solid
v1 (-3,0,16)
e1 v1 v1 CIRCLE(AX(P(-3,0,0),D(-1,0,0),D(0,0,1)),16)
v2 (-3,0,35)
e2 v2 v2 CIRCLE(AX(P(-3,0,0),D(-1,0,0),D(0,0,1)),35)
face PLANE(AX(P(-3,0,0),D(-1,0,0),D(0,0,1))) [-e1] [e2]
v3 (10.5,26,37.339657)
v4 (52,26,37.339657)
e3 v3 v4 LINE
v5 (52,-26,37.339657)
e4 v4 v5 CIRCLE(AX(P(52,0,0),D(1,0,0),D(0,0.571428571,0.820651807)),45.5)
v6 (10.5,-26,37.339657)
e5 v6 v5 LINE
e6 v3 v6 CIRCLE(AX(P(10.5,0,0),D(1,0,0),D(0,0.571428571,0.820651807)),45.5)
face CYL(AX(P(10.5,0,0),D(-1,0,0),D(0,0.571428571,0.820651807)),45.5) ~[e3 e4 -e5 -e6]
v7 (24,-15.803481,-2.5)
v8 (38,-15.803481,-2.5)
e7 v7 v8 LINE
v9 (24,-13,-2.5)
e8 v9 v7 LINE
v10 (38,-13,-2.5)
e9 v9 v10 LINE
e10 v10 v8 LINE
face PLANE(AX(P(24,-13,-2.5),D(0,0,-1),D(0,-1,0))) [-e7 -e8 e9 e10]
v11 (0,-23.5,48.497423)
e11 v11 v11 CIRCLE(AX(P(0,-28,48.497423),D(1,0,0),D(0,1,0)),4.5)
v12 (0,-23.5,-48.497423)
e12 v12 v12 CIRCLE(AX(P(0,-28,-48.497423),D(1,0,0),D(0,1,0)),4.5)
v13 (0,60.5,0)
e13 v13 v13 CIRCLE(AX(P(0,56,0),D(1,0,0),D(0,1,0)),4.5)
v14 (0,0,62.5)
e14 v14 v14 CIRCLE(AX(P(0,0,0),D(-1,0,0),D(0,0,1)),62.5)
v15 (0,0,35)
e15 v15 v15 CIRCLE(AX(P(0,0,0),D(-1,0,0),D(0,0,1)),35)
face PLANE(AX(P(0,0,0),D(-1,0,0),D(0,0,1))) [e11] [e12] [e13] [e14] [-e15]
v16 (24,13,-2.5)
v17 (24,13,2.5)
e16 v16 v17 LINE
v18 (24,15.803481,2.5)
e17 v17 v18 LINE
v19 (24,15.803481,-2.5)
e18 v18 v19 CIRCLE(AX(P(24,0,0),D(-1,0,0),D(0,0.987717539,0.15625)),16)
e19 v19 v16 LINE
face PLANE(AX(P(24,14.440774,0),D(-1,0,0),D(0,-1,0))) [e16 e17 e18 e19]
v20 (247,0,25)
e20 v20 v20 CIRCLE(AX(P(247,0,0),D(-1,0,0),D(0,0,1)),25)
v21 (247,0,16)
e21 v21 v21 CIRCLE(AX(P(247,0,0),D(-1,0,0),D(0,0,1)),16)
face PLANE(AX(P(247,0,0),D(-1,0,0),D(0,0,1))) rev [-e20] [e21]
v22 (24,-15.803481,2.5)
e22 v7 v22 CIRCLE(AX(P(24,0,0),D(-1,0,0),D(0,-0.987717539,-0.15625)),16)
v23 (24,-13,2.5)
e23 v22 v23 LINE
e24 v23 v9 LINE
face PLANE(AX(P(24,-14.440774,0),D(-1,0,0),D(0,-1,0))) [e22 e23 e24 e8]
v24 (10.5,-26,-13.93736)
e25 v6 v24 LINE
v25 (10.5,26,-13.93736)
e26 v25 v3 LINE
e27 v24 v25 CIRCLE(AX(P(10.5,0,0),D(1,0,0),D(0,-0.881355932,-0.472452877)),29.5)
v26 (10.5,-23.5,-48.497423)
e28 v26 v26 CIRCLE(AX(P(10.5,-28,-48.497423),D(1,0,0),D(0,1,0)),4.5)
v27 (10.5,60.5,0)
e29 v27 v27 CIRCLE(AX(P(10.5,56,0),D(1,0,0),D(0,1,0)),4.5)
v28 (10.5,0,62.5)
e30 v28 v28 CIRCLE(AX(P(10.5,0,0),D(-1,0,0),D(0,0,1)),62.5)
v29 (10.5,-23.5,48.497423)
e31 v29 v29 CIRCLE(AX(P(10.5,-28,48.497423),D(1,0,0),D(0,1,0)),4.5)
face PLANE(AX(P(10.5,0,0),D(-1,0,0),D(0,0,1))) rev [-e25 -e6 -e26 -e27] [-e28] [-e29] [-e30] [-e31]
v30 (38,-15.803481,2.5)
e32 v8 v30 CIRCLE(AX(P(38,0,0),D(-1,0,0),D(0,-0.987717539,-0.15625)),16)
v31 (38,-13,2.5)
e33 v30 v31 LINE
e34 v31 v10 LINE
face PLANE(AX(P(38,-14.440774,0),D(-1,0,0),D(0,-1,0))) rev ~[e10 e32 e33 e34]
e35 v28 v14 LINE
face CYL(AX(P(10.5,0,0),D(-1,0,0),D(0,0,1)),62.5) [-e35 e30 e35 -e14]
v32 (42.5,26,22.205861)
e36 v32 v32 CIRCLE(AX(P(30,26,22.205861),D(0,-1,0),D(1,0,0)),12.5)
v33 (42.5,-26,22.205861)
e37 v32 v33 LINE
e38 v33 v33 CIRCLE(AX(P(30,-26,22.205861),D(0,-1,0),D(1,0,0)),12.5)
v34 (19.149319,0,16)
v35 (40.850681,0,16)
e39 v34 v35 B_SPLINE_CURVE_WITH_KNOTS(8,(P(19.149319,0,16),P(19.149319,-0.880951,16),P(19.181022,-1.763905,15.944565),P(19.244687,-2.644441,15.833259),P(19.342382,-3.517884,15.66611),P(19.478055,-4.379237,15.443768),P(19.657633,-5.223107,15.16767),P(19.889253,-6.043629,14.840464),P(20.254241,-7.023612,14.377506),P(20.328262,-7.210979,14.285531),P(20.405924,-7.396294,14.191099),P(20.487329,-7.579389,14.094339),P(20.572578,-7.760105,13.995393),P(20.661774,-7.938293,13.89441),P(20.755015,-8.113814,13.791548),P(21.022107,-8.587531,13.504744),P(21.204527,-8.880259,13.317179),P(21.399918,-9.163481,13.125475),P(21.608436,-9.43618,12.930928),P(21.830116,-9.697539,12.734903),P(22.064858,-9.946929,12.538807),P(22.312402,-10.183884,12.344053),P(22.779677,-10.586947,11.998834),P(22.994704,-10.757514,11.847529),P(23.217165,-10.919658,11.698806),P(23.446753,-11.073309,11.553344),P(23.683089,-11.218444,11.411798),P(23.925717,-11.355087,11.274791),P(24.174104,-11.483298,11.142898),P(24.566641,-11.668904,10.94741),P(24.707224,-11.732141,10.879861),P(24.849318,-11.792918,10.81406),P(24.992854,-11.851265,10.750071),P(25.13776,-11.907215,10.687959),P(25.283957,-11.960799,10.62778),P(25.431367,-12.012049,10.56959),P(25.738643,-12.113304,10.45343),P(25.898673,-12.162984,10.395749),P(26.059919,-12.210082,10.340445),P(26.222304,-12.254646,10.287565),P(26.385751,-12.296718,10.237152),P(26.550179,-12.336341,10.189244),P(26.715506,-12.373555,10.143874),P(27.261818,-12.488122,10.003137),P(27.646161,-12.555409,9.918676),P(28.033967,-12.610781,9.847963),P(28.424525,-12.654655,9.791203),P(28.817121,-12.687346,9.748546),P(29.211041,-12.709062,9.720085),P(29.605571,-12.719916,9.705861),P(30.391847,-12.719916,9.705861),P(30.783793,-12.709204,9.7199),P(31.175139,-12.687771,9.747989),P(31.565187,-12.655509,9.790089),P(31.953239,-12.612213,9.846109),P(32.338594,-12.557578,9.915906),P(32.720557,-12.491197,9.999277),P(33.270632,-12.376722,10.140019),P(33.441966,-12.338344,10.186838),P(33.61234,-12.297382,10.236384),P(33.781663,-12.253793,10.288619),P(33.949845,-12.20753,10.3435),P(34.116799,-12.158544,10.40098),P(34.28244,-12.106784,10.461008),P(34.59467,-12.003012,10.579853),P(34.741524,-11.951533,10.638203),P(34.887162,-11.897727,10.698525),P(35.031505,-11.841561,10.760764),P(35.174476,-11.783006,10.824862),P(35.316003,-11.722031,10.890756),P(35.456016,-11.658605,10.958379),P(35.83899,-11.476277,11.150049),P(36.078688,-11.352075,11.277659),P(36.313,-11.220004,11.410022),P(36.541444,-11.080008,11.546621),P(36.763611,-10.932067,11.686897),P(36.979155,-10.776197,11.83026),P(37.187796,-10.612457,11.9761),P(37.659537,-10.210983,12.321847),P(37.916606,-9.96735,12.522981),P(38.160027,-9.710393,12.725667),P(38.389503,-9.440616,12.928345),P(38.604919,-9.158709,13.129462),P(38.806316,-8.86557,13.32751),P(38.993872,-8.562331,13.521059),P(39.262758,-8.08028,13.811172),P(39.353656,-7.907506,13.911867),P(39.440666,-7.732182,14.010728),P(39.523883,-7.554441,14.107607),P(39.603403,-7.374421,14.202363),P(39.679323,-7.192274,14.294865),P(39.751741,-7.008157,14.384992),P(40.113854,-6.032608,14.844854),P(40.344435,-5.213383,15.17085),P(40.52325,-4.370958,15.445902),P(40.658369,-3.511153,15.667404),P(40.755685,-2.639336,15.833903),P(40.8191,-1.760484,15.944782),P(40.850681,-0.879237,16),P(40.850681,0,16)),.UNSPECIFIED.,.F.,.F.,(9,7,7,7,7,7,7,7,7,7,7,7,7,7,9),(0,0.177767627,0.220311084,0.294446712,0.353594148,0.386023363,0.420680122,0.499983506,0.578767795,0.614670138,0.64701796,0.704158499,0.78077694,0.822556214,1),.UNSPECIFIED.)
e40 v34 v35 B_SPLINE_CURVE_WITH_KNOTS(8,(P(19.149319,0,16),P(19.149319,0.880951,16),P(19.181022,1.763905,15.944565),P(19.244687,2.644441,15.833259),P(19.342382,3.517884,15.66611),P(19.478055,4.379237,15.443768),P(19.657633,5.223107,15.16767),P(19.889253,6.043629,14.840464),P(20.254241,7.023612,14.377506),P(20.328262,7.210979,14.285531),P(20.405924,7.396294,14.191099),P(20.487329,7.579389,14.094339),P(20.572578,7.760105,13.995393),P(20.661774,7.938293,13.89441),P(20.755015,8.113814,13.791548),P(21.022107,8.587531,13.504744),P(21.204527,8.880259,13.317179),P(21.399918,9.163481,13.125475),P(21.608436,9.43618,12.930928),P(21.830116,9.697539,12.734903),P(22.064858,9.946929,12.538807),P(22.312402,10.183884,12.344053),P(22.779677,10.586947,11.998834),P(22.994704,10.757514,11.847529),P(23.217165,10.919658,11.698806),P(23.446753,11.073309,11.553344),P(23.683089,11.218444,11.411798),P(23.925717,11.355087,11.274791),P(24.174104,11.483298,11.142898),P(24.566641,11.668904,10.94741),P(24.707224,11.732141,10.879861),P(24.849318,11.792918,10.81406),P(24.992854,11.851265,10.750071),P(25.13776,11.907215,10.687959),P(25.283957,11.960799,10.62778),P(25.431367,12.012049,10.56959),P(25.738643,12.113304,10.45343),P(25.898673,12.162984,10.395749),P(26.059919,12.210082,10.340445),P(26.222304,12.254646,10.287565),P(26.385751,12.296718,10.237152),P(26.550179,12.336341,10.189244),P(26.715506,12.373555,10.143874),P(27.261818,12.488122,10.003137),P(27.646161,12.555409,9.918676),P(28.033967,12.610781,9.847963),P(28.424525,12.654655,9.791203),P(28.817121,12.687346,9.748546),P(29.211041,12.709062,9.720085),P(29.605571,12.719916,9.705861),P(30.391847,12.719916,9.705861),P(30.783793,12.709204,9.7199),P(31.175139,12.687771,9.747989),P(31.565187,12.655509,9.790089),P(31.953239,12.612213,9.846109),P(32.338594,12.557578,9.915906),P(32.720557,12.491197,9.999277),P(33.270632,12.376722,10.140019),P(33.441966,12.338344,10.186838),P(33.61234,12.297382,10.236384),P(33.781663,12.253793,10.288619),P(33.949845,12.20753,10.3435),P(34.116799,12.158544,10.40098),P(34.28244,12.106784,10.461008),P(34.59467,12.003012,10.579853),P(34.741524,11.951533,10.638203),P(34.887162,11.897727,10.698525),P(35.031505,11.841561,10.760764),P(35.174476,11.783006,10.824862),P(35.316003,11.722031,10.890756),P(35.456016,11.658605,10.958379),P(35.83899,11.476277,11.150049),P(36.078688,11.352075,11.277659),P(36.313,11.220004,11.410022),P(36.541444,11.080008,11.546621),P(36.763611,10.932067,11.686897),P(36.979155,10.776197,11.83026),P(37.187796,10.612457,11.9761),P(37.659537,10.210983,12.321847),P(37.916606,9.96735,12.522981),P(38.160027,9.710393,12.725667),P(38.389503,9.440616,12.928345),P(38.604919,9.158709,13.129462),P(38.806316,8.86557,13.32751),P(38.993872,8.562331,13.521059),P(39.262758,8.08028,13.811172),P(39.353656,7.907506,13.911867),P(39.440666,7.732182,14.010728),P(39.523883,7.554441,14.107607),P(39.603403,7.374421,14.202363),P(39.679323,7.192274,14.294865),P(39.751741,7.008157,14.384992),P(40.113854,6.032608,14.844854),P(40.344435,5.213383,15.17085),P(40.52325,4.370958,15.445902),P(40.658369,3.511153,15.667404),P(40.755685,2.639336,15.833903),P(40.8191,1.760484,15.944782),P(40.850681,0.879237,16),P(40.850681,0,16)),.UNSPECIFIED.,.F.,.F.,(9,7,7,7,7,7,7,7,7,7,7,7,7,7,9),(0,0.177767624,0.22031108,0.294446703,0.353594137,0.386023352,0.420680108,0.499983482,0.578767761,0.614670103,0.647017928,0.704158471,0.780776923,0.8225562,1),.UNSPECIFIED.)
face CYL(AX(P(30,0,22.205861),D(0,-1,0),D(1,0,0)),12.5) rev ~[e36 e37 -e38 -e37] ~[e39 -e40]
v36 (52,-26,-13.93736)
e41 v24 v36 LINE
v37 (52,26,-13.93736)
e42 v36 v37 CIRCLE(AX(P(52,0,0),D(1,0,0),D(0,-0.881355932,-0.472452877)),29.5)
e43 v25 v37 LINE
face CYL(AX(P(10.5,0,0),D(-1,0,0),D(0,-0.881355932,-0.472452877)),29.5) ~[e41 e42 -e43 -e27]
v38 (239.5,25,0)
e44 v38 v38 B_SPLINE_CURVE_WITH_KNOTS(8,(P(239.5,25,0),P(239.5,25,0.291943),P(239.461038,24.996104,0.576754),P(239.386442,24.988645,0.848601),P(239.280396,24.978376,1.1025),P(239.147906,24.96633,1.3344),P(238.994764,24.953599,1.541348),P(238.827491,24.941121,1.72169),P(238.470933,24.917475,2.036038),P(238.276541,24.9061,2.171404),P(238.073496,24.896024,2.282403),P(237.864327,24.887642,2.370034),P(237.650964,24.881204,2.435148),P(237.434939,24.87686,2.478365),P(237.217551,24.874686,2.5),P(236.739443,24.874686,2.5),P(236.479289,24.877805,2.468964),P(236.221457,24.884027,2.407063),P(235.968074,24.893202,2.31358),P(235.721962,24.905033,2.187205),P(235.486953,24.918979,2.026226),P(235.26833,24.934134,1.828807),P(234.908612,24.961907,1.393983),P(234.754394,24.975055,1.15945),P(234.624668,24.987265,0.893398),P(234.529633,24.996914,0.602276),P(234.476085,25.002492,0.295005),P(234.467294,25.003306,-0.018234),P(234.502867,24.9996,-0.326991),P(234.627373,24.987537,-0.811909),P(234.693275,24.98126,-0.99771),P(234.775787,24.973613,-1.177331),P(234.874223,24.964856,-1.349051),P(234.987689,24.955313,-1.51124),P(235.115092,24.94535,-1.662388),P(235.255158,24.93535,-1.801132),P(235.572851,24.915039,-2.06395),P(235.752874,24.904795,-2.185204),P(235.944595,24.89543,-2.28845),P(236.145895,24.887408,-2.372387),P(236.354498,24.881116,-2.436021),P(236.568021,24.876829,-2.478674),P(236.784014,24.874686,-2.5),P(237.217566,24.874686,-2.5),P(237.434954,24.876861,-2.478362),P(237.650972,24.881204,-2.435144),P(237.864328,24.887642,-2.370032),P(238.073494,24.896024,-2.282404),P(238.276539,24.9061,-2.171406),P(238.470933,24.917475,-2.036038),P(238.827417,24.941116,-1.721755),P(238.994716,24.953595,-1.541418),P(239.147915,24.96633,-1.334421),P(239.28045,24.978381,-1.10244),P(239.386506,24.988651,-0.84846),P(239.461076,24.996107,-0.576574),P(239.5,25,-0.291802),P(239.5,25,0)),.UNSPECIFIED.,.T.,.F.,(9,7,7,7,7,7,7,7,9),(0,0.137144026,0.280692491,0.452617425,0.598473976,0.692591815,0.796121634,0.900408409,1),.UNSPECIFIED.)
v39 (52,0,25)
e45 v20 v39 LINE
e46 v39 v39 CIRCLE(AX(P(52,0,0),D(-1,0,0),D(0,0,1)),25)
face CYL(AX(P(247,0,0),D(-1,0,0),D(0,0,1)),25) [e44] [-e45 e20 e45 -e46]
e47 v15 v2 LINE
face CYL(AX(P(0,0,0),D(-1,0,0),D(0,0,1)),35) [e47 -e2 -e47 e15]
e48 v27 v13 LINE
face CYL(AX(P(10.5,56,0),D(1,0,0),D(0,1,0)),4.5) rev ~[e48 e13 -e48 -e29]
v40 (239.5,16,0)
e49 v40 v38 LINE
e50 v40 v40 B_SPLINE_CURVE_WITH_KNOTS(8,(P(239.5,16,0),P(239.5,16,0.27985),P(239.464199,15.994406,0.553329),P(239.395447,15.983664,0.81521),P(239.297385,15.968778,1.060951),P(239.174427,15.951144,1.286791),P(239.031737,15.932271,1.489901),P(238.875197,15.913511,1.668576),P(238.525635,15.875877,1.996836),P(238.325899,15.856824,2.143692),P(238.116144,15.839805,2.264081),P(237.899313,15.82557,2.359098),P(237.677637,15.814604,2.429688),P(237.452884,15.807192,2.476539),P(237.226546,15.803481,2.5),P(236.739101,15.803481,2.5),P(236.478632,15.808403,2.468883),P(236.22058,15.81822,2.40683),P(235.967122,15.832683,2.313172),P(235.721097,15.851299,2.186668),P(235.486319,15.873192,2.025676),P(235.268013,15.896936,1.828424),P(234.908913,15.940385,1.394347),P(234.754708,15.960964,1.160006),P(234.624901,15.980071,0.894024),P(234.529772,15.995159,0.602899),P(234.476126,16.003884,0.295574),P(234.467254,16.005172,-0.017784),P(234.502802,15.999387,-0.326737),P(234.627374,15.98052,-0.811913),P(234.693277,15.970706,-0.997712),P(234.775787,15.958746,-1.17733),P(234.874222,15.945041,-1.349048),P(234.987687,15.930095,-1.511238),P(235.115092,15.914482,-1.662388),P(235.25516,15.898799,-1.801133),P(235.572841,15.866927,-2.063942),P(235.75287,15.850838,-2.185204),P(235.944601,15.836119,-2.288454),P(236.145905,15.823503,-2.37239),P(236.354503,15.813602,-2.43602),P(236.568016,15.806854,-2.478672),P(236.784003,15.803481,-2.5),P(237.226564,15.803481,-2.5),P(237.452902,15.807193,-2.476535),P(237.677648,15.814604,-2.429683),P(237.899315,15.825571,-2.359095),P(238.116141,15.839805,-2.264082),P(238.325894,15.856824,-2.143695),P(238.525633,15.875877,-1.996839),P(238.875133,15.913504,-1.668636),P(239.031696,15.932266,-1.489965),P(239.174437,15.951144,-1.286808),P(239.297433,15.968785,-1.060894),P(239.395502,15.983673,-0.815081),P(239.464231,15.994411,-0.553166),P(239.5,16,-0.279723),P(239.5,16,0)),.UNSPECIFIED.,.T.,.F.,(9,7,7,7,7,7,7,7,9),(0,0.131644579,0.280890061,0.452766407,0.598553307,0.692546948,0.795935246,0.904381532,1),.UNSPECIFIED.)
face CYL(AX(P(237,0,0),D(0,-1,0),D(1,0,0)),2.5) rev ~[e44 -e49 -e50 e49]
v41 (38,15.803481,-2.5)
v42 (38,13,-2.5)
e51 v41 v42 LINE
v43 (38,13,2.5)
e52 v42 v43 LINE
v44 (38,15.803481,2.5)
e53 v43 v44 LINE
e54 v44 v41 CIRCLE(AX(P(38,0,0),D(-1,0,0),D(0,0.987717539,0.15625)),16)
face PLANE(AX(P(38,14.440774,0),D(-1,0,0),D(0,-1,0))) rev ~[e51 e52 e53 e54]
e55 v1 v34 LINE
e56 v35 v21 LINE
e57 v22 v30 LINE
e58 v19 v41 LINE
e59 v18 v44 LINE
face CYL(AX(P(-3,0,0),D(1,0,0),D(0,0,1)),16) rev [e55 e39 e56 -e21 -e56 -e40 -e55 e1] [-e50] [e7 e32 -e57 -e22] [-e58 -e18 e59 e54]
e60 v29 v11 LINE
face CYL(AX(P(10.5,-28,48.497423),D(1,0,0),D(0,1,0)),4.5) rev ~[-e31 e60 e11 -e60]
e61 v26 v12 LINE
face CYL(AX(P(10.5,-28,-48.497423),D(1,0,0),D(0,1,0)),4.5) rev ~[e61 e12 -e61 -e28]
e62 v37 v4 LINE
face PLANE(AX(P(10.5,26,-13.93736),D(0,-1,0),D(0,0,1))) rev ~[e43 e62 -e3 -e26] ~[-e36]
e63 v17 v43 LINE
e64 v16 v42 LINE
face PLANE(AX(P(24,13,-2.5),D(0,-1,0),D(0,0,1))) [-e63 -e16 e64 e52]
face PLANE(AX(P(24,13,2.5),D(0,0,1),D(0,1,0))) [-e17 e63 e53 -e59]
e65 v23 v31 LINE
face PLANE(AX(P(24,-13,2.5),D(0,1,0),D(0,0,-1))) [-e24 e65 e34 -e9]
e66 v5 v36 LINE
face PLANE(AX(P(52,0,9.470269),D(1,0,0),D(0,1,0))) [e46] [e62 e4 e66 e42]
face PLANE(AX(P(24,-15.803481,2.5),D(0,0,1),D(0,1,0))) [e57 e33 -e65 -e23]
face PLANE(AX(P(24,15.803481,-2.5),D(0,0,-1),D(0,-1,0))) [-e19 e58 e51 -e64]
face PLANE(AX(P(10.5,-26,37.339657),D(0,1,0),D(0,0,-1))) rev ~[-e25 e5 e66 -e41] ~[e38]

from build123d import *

# Parameters (mm, degrees)
F2_R      = 25
F3_DEPTH  = 41.5
F4_R      = 12.5
F5_DEPTH  = 30
F6_R      = 2.5
F7_DEPTH  = 62.501
F8_R      = 4.5
F9_DEPTH  = 13.5010001
F12_DEPTH = 14


with BuildPart() as f1:
    # F0 (on Front) → F1 (revolve)
    with BuildSketch(Plane.XZ):
        Polygon((10.5, 62.5), (0, 62.5), (0, 35), (-3, 35), (-3, 16), (247, 16), (247, 25), (10.5, 25), align=None)
    revolve(axis=Axis((-11.2489545718, 0, 0), (-1, 0, 0)))

    # F2 (on face) → F3 (join)
    with BuildSketch(Plane.YZ.offset(10.5)):
        with BuildLine():
            Line((26, -13.9373598648), (26, 37.3396572025))
            ThreePointArc((26, 37.3396572025), (0, 45.5), (-26, 37.3396572025))
            Line((-26, 37.3396572025), (-26, -13.9373598648))
            ThreePointArc((-26, -13.9373598648), (0, -29.5), (26, -13.9373598648))
        make_face()
        Circle(F2_R, mode=Mode.SUBTRACT)
    extrude(amount=F3_DEPTH)

    # F4 (on Front) → F5 (cut, symmetric)
    with BuildSketch(Plane.XZ):
        with Locations((30, 22.2058613113)):
            Circle(F4_R)
    extrude(amount=F5_DEPTH, both=True, mode=Mode.SUBTRACT)

    # F6 (on Front) → F7 (cut, through all)
    with BuildSketch(Plane.XZ):
        with Locations((237, 0)):
            Circle(F6_R)
    extrude(amount=-F7_DEPTH, mode=Mode.SUBTRACT)

    # F8 (on face) → F9 (cut, through all)
    with BuildSketch(Plane.YZ.offset(10.5)):
        with Locations((-28, 48.4974226119)):
            Circle(F8_R)
        with Locations((56, 0)):
            Circle(F8_R)
        with Locations((-28, -48.4974226119)):
            Circle(F8_R)
    extrude(amount=-F9_DEPTH, mode=Mode.SUBTRACT)

    # F11 (on offset) → F12 (join)
    with BuildSketch(Plane(origin=(24, 0, 0), x_dir=(0, -1, 0), z_dir=(-1, 0, 0))):
        with BuildLine():
            Line((-13, 2.5), (-15.8034806293, 2.5))
            ThreePointArc((-15.8034806293, 2.5), (-16, 0), (-15.8034806293, -2.5))
            Line((-15.8034806293, -2.5), (-13, -2.5))
            Line((-13, -2.5), (-13, 2.5))
        make_face()
        with BuildLine():
            ThreePointArc((15.8034806293, -2.5), (16, 0), (15.8034806293, 2.5))
            Line((15.8034806293, 2.5), (13, 2.5))
            Line((13, 2.5), (13, -2.5))
            Line((13, -2.5), (15.8034806293, -2.5))
        make_face()
    extrude(amount=-F12_DEPTH)


solid = f1.part
